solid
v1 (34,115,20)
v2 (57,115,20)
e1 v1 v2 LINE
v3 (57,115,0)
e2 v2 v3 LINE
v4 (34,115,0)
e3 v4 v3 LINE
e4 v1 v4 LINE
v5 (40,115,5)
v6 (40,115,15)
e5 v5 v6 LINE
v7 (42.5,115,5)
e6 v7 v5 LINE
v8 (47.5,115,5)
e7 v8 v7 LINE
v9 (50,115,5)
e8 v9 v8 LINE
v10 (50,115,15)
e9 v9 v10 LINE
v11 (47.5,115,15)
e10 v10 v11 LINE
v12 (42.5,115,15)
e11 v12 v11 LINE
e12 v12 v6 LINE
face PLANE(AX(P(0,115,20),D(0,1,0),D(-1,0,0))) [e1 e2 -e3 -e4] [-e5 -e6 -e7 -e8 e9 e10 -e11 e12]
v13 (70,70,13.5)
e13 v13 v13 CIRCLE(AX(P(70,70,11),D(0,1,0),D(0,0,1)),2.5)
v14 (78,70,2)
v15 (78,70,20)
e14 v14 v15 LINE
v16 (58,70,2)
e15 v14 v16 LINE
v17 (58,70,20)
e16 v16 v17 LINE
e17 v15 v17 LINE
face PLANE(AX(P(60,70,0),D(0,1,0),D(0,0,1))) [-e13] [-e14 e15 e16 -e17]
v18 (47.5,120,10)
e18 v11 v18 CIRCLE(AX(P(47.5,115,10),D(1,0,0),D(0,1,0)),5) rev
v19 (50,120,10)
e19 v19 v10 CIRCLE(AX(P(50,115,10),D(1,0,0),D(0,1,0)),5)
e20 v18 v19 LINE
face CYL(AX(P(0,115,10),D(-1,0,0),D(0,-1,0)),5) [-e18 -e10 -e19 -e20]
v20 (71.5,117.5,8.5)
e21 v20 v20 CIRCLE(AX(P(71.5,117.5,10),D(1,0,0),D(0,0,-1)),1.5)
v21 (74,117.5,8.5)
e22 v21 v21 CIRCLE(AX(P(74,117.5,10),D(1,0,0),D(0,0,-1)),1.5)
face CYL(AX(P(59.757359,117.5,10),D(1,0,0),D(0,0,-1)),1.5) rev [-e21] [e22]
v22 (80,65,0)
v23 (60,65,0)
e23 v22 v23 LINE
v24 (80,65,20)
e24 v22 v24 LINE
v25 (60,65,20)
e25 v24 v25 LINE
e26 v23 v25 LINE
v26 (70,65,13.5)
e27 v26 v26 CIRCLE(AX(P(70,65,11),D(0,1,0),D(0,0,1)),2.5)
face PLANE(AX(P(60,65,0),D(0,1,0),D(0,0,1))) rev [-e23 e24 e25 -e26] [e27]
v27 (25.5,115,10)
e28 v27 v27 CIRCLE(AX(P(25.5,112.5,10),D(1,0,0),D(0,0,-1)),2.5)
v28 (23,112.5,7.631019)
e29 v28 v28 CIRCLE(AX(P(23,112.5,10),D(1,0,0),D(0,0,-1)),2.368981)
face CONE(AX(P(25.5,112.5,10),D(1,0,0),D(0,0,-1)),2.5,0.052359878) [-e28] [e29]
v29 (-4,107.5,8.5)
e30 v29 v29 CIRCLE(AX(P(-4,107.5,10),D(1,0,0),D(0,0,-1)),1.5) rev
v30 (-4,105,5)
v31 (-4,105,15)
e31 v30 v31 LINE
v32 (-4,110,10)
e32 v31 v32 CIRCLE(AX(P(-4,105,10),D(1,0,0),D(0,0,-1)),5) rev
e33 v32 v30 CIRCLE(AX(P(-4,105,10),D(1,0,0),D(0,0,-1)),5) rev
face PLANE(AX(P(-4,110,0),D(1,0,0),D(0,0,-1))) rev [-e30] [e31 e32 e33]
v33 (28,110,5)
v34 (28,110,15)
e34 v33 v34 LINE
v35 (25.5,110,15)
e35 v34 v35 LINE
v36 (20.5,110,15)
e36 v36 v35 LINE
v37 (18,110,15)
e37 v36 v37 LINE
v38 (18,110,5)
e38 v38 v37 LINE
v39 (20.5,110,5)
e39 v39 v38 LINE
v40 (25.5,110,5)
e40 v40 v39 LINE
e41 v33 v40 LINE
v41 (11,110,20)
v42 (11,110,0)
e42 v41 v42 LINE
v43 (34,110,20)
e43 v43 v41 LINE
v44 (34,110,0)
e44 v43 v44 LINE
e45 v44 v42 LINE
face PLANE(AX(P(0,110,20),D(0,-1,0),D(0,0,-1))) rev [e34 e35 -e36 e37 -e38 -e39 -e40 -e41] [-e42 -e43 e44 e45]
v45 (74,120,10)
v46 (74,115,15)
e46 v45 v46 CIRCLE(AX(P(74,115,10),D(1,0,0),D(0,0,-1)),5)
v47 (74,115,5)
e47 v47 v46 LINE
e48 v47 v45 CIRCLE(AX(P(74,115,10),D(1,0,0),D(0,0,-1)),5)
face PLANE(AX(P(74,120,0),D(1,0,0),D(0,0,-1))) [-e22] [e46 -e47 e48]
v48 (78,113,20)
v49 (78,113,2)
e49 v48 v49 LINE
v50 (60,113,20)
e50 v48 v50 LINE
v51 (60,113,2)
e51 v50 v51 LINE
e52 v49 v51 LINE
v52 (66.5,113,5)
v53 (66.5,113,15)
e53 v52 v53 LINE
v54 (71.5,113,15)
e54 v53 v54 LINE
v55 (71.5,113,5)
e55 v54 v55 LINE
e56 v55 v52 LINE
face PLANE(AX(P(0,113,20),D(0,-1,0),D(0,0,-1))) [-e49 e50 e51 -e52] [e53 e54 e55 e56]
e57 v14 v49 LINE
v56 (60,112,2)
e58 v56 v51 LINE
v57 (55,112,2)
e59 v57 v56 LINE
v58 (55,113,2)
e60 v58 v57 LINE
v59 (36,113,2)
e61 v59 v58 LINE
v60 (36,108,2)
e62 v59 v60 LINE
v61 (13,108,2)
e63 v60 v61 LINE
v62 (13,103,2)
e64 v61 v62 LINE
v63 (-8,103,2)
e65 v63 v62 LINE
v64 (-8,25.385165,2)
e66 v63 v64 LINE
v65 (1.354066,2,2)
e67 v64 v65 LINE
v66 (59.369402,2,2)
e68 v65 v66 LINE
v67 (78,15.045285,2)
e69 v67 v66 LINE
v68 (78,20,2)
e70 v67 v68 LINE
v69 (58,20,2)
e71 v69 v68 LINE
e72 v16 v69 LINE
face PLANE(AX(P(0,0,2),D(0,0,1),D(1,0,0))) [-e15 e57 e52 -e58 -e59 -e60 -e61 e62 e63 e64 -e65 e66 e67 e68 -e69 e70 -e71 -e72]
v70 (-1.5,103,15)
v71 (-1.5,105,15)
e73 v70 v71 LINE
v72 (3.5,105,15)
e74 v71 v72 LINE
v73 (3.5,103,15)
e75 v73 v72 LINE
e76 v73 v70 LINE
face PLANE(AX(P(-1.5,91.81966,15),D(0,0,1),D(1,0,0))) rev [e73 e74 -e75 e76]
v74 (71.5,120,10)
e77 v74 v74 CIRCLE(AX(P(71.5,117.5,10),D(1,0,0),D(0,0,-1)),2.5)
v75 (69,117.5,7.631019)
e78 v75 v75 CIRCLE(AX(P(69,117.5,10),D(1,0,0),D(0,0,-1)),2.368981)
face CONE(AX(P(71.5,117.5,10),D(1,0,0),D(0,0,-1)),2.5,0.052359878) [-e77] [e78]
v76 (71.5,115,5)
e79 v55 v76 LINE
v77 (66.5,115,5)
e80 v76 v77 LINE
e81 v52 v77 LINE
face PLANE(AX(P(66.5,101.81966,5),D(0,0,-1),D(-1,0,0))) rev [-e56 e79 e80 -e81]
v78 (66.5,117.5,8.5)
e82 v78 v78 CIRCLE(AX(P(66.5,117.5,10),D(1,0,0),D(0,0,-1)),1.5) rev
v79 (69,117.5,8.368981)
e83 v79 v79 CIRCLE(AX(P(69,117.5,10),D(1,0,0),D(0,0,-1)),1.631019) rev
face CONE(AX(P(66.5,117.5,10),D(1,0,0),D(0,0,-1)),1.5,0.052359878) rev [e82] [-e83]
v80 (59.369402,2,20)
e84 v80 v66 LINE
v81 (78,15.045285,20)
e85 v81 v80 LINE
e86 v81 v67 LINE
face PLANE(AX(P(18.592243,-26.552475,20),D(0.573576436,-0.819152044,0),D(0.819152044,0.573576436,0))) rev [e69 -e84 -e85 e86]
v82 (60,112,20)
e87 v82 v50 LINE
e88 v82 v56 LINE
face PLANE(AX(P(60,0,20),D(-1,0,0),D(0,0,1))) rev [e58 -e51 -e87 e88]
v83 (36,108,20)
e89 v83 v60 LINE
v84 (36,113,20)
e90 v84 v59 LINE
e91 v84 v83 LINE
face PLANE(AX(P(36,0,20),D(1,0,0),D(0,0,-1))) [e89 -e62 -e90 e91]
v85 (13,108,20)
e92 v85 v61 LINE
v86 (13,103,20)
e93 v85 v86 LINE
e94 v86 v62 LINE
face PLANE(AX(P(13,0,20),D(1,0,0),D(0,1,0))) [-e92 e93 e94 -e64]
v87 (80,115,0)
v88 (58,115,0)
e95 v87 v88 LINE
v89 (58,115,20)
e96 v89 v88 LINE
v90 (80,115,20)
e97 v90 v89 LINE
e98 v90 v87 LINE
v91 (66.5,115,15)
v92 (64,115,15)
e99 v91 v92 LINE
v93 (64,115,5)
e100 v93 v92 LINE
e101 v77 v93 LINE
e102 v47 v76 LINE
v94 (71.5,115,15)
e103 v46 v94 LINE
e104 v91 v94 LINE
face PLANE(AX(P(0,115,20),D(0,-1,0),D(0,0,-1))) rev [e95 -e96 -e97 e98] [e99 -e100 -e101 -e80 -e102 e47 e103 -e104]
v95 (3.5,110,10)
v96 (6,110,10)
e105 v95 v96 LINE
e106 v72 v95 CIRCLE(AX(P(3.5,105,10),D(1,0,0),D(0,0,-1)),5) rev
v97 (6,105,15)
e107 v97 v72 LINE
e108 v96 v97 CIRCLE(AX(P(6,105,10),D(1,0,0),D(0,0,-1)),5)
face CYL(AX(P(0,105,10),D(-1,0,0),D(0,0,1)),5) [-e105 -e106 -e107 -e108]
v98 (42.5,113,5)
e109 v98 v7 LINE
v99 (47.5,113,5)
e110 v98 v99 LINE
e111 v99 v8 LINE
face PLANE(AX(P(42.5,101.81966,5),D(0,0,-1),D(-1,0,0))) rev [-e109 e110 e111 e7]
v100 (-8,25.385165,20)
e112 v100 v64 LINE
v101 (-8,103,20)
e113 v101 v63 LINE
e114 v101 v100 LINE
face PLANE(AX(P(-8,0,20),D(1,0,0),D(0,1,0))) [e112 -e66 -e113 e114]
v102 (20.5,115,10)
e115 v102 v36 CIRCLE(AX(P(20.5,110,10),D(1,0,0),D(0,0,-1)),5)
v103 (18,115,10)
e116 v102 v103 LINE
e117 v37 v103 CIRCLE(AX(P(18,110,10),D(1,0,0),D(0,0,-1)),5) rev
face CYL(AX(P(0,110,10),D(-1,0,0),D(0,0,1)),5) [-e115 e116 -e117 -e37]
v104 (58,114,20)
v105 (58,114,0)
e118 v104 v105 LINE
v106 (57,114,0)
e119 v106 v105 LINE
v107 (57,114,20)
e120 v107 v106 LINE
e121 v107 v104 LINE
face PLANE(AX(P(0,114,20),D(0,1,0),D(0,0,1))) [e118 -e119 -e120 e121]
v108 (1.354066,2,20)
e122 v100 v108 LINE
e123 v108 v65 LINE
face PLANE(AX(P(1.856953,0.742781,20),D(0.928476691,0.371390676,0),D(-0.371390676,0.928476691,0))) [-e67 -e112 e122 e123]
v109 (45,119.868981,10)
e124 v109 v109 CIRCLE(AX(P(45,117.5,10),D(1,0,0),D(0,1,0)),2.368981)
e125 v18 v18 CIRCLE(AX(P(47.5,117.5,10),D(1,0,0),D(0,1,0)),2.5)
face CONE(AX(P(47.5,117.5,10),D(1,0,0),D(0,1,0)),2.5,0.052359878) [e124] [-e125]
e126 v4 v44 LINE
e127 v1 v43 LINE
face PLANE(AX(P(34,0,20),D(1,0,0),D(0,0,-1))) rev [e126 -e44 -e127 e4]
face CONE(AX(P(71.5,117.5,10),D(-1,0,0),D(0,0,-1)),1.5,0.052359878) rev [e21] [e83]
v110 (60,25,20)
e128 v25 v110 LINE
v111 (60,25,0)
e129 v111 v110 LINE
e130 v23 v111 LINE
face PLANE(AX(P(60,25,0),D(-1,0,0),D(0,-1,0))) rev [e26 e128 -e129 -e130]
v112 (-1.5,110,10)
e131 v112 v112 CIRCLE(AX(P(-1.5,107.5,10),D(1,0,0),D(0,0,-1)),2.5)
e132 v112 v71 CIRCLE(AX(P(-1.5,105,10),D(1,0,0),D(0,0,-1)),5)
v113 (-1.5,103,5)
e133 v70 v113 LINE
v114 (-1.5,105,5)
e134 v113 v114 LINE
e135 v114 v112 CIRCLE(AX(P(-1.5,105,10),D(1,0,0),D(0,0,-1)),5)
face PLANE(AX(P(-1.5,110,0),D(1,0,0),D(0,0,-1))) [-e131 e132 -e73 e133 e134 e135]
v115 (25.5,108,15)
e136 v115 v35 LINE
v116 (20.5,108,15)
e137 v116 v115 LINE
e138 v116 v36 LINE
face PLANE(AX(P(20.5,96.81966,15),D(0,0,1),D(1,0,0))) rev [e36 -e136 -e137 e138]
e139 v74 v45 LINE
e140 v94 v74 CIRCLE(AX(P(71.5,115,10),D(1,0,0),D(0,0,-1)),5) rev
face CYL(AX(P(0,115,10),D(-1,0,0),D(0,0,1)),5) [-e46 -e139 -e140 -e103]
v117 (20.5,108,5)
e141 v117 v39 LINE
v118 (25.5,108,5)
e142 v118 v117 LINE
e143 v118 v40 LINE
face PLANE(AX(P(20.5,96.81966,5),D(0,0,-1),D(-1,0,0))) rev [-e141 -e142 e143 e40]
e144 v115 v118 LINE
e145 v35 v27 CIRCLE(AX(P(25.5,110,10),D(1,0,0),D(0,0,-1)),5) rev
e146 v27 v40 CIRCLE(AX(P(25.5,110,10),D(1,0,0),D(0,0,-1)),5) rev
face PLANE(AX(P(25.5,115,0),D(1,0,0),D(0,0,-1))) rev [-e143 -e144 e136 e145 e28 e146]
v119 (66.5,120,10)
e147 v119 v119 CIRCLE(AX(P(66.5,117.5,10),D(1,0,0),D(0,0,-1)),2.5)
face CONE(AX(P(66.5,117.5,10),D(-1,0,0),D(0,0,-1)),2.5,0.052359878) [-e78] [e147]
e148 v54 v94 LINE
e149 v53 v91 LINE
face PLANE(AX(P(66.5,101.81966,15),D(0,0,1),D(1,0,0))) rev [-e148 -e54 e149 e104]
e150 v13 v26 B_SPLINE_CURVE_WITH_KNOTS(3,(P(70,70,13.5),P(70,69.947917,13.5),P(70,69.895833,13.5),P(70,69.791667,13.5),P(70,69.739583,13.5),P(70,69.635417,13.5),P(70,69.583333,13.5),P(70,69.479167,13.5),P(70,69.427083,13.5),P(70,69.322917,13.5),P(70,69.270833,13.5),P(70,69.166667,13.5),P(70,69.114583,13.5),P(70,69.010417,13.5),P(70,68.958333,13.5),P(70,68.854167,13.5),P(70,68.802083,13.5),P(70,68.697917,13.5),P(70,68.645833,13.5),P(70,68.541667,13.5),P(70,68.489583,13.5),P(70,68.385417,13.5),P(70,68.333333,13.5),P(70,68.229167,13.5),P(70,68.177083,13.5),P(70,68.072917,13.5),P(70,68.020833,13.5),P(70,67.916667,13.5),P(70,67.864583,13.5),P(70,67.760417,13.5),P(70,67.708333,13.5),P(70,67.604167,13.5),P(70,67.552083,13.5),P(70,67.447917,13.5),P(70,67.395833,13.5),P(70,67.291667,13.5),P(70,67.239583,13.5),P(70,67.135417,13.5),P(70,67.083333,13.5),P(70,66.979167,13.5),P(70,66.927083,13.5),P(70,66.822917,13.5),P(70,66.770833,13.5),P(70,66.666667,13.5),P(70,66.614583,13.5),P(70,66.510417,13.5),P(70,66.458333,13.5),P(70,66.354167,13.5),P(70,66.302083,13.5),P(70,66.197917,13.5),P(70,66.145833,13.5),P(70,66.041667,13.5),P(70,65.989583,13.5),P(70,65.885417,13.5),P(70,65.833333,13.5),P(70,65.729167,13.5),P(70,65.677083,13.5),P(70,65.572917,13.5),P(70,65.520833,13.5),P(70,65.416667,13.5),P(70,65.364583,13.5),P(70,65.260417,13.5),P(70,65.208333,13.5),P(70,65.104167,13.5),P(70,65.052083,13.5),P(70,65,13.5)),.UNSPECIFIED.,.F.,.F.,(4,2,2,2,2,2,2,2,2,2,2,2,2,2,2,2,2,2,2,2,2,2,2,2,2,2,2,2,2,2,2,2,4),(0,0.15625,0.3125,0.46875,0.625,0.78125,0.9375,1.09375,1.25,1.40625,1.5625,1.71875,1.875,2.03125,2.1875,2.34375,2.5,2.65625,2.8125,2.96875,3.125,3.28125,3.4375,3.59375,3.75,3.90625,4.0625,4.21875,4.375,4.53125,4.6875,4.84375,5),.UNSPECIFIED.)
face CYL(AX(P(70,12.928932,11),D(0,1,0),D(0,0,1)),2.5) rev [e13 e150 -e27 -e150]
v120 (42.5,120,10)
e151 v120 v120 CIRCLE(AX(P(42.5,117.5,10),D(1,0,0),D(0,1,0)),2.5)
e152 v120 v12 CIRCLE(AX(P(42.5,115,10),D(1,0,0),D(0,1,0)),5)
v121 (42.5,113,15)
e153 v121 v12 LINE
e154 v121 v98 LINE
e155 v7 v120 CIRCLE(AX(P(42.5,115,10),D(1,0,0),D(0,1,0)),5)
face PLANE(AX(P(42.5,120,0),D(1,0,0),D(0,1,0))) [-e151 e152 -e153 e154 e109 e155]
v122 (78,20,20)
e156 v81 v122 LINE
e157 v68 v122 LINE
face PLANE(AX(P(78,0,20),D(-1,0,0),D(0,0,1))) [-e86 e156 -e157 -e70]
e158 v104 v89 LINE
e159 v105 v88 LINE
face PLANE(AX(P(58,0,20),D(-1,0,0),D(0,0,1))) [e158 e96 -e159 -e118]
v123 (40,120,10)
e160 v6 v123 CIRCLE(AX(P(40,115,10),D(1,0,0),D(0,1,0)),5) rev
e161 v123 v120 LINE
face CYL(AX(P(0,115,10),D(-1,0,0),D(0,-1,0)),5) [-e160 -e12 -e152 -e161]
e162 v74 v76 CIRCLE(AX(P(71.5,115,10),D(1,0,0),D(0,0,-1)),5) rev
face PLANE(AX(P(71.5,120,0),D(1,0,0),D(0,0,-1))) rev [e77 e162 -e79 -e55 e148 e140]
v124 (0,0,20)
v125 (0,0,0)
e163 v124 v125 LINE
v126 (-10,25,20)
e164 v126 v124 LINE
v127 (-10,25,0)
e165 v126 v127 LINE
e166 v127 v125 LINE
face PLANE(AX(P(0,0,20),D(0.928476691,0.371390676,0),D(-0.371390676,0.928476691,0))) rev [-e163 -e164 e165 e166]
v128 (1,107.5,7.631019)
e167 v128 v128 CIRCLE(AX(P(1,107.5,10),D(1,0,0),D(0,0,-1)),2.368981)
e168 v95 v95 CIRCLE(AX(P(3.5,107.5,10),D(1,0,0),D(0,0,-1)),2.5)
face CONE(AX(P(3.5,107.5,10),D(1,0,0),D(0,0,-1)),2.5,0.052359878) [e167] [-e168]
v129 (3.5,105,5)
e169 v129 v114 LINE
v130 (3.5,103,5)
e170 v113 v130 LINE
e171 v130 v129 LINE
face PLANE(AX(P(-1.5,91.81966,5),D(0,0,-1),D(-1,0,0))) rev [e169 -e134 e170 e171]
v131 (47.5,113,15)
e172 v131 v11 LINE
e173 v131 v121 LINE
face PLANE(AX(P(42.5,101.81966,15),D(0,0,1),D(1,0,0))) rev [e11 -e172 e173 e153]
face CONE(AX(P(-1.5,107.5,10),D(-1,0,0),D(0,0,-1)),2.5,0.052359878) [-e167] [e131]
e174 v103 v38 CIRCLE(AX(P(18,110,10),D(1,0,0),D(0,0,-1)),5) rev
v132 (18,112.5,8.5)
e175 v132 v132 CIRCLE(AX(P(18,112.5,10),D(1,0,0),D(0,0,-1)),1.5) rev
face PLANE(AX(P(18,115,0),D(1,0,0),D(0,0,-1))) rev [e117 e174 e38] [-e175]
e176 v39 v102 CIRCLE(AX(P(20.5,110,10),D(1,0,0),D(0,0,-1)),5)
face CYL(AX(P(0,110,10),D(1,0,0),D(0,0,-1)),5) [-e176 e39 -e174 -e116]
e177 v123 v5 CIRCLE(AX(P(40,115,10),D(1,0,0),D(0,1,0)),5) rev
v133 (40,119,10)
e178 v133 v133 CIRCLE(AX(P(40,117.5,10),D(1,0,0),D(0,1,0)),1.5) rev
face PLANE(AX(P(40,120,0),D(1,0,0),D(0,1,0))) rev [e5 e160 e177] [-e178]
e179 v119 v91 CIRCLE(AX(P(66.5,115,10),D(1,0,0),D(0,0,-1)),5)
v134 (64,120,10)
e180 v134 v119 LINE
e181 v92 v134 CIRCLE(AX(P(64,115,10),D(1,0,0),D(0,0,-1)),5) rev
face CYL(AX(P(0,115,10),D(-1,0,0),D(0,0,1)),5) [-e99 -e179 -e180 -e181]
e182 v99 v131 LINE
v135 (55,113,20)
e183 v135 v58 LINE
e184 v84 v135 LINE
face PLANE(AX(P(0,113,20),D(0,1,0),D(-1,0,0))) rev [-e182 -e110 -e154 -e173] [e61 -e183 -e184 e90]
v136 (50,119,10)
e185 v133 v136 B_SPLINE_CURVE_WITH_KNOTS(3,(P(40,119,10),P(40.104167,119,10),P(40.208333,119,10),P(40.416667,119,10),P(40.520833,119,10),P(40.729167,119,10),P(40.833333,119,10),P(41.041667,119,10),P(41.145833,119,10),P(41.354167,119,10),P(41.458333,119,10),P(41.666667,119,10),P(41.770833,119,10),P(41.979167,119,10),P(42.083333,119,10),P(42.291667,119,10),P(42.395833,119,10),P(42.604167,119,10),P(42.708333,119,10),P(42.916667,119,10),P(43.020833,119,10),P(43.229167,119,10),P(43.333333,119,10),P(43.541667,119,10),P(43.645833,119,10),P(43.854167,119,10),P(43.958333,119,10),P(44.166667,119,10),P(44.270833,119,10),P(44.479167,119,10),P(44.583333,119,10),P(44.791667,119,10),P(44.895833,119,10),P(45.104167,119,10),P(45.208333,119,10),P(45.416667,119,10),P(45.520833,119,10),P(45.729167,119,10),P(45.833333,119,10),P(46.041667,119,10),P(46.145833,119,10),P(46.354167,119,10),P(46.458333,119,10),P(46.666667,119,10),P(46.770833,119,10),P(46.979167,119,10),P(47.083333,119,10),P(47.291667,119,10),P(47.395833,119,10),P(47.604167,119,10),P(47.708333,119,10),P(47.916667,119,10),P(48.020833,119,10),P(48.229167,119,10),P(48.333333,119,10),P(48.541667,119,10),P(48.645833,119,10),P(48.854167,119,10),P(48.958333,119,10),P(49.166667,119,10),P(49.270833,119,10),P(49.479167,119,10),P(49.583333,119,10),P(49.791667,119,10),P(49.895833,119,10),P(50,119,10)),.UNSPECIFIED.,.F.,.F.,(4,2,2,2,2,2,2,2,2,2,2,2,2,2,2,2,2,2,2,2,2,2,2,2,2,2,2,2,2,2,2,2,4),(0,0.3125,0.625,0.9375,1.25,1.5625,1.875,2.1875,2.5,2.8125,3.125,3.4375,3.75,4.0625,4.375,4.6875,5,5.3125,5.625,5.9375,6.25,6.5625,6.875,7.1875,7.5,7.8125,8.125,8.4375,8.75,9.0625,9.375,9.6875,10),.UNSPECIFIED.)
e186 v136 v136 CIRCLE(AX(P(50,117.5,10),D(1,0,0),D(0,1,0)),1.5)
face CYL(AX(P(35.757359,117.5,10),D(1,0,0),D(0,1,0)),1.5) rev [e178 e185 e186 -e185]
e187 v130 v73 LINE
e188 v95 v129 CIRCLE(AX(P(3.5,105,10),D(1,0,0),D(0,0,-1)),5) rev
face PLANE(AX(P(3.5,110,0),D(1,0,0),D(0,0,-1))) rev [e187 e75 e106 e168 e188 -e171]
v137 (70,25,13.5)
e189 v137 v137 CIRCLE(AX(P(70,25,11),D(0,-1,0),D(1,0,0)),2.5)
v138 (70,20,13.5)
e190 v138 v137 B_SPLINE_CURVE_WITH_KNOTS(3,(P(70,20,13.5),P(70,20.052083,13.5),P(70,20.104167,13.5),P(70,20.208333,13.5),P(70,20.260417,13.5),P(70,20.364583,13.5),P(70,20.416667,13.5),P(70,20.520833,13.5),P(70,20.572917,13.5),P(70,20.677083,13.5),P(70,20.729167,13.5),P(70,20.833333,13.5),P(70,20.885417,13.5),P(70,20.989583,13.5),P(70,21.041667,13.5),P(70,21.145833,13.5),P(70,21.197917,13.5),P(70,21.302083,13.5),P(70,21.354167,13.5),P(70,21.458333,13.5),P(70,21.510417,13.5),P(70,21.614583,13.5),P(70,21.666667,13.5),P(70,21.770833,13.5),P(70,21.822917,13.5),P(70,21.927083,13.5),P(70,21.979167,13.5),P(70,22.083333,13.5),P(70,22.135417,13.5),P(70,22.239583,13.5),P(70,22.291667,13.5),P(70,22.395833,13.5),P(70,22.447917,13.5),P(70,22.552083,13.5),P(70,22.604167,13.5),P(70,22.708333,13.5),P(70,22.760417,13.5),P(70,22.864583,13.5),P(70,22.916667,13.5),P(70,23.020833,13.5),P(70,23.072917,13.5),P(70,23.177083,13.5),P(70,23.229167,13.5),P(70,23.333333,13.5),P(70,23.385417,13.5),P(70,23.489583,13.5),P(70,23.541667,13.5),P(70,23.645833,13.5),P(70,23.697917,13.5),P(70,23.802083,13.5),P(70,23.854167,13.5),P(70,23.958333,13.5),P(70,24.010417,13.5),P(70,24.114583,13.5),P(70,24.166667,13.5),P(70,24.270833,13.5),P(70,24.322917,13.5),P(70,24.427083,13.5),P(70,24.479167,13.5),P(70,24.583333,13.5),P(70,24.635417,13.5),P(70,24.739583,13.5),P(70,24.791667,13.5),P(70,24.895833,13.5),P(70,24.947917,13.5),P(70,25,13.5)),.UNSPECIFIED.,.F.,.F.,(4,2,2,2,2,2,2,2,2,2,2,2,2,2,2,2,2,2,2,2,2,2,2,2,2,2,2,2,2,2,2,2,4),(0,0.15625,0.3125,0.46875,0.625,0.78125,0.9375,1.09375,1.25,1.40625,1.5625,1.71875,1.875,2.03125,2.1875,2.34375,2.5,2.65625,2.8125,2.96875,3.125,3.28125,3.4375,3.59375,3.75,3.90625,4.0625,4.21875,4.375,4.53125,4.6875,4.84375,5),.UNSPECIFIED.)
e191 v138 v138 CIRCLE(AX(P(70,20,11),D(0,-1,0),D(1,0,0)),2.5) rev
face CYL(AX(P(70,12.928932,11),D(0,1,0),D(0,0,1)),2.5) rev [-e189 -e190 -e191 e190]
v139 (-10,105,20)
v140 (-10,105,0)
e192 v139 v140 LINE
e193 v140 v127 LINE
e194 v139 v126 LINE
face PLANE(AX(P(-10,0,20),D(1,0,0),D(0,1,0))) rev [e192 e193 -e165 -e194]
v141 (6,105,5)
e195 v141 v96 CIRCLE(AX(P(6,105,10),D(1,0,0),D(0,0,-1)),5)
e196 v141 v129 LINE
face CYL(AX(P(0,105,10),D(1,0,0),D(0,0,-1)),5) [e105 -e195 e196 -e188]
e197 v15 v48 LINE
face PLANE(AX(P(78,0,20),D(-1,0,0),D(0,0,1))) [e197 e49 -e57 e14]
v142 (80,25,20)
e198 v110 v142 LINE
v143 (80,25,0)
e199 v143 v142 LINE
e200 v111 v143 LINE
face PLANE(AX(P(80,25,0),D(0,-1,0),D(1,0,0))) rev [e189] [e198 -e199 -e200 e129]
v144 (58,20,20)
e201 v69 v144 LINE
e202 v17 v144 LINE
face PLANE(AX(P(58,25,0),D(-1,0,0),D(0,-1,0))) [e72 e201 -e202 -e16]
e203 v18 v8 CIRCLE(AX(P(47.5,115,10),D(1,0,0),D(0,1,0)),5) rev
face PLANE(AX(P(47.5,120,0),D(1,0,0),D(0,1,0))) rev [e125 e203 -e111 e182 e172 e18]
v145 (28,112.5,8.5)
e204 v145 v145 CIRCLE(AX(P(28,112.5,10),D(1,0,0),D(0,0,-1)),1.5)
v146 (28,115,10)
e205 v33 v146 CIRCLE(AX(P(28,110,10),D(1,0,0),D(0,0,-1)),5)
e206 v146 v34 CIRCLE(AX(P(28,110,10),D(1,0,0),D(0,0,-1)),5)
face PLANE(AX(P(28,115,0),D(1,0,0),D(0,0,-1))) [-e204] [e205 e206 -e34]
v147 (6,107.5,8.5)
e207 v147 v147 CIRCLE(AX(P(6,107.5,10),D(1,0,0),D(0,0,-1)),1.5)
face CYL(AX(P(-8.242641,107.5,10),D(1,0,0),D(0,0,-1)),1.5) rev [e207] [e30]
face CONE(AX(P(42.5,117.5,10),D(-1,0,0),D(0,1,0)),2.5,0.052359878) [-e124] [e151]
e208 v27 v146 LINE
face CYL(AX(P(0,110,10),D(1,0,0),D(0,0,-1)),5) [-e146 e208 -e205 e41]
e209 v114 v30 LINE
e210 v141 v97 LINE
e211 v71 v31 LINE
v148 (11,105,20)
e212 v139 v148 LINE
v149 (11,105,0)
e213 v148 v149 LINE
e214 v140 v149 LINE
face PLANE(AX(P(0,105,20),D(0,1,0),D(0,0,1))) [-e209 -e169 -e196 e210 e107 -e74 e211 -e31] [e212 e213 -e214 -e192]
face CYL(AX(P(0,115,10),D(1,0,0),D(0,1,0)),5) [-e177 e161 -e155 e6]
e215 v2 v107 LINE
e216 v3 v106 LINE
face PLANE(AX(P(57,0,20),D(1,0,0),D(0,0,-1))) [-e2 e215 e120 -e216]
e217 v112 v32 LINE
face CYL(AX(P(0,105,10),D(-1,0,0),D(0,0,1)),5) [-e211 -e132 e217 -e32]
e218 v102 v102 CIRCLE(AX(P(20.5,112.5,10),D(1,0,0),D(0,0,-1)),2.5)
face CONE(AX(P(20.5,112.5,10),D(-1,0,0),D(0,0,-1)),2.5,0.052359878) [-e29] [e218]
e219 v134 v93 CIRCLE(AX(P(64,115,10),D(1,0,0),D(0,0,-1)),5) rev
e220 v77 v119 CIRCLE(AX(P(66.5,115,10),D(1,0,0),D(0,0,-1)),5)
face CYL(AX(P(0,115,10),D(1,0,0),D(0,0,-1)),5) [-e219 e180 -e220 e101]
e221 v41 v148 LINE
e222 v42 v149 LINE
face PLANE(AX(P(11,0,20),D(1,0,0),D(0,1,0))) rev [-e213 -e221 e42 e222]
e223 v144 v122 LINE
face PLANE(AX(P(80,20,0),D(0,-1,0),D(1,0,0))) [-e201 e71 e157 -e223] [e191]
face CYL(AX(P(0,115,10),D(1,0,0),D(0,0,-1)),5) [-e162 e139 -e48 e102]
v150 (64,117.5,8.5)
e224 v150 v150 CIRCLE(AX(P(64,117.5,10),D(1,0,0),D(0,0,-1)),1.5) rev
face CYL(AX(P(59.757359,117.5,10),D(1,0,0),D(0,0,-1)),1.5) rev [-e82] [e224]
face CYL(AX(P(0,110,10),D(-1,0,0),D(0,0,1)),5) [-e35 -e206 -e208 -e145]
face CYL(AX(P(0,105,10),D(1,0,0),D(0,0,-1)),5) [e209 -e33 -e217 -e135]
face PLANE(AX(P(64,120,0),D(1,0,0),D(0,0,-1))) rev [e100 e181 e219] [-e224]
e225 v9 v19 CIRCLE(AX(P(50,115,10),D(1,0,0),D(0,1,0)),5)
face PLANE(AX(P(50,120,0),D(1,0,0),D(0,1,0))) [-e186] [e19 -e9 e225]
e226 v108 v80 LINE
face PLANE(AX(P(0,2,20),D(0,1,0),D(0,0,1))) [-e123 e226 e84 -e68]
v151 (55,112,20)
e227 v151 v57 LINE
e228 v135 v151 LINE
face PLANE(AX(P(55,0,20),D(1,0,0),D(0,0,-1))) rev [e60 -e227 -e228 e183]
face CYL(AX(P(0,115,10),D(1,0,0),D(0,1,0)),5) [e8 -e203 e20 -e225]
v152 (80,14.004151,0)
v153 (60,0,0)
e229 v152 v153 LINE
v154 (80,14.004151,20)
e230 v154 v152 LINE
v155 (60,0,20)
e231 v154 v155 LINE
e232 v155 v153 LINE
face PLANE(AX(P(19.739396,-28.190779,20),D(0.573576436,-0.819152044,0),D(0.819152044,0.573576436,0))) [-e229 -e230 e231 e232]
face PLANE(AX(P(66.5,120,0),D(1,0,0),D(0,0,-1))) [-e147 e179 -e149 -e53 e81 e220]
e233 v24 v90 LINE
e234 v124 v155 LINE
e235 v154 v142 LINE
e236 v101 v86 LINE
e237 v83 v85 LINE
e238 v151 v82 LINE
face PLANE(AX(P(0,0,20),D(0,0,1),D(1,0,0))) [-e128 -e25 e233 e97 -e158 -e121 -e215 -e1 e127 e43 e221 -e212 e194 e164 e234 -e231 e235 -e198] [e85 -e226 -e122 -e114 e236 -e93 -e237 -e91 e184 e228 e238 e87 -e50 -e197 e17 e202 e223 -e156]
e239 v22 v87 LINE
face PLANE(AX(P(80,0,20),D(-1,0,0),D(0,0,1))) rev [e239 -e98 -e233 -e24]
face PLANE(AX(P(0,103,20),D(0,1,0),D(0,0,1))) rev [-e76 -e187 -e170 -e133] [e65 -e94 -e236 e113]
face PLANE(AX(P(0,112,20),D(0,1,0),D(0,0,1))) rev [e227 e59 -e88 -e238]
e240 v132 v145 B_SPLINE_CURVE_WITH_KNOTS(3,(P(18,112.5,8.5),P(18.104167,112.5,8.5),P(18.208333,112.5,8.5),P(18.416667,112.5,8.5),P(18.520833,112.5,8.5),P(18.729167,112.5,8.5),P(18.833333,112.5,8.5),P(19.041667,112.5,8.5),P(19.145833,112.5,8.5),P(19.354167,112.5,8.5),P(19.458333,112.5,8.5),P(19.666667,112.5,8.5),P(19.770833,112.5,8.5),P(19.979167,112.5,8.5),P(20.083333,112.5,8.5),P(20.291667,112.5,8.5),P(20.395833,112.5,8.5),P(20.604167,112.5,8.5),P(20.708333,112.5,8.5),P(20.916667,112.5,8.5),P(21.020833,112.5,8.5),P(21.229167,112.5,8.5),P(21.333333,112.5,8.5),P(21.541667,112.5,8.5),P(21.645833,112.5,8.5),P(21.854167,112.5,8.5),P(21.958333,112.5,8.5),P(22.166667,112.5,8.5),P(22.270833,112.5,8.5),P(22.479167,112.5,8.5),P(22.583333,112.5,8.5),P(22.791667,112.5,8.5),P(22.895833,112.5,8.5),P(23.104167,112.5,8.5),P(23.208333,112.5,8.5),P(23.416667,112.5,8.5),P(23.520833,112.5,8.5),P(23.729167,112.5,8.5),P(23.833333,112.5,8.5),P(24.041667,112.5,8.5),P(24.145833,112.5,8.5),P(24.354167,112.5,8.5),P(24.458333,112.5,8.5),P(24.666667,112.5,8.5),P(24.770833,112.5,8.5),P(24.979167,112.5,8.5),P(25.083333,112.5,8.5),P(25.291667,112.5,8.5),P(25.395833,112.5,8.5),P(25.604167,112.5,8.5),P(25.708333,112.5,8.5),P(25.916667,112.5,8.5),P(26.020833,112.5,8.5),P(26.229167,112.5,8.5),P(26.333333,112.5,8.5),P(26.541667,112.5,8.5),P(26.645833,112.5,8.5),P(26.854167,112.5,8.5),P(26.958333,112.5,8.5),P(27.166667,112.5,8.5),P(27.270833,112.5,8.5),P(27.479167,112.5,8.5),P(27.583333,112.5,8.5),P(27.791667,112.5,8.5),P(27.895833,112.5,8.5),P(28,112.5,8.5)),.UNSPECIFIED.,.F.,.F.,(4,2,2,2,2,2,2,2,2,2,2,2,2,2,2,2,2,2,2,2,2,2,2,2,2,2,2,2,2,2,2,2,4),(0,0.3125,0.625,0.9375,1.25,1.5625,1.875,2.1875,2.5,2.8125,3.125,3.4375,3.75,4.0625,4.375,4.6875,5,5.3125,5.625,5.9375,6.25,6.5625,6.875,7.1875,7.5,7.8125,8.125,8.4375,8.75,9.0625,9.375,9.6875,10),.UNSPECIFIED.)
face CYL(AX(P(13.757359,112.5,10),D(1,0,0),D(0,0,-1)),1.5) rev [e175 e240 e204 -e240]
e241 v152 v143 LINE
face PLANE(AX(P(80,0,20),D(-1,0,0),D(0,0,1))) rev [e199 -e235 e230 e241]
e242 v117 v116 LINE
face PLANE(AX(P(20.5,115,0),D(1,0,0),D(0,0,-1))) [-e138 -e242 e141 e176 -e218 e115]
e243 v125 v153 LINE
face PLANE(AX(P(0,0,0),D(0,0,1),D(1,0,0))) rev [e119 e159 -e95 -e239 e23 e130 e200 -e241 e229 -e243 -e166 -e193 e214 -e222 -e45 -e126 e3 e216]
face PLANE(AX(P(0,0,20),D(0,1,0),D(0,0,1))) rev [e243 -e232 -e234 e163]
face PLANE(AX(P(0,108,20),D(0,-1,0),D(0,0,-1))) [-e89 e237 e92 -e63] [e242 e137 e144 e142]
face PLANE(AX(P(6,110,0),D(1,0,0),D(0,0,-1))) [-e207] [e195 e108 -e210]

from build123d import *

# Parameters (mm, degrees)
BOSS_EXTRUDE1_DEPTH       = 20
SKETCH2_W                 = 20
SKETCH2_H                 = 40
CUT_EXTRUDE1_DEPTH        = 142.509716981
SHELL1_T                  = -2
SHELL1_THICKNESS_2_FACE_W = 20
SHELL1_THICKNESS_2_FACE_H = 18
SHELL1_THICKNESS_2_DEPTH  = 3
SHELL1_THICKNESS_3_FACE_W = 18
SHELL1_THICKNESS_3_FACE_H = 20
SHELL1_THICKNESS_3_DEPTH  = 3
CUT_EXTRUDE14_REACH       = 110.167
SKETCH34_R                = 2.5
SKETCH3_W                 = 2.5
SKETCH3_H                 = 10
BOSS_EXTRUDE2_DEPTH       = 5
FILLET2_R                 = 5
CUT_EXTRUDE3_REACH        = 149.838
SKETCH6_R                 = 1.5
SKETCH21_R                = 2.5
SKETCH21_R_2              = 1.5
BOSS_EXTRUDE10_DEPTH      = 2.5
BOSS_EXTRUDE10_DRAFT      = 3
MIRROR7_COPY_1_SKETCH_R   = 2.5
MIRROR7_COPY_1_SKETCH_R_2 = 1.5
MIRROR7_COPY_1_DEPTH      = 2.5
MIRROR7_COPY_1_DRAFT      = 3
SKETCH26_W                = 5
SKETCH26_H                = 10
CUT_EXTRUDE8_DEPTH        = 2
SKETCH7_W                 = 2.5
SKETCH7_H                 = 10
BOSS_EXTRUDE4_DEPTH       = 5
FILLET4_R                 = 5
SKETCH22_R                = 2.5
BOSS_EXTRUDE11_DEPTH      = 2.5
BOSS_EXTRUDE11_TAPER      = 3
SKETCH23_R                = 1.5
CUT_EXTRUDE7_DEPTH        = 10
SKETCH27_W                = 5
SKETCH27_H                = 10
CUT_EXTRUDE9_DEPTH        = 2
SKETCH10_W                = 2.5
SKETCH10_H                = 10
BOSS_EXTRUDE6_DEPTH       = 5
FILLET6_R                 = 5
SKETCH28_R                = 2.5
BOSS_EXTRUDE12_DEPTH      = 2.5
BOSS_EXTRUDE12_TAPER      = 3
SKETCH29_R                = 1.5
CUT_EXTRUDE10_DEPTH       = 10
SKETCH30_W                = 5
SKETCH30_H                = 10
CUT_EXTRUDE11_DEPTH       = 2
SKETCH13_W                = 2.5
SKETCH13_H                = 10
BOSS_EXTRUDE8_DEPTH       = 5
FILLET8_R                 = 5
SKETCH31_R                = 2.5
BOSS_EXTRUDE13_DEPTH      = 2.5
BOSS_EXTRUDE13_TAPER      = 3
SKETCH32_R                = 1.5
CUT_EXTRUDE12_DEPTH       = 10
SKETCH33_W                = 5
SKETCH33_H                = 10
CUT_EXTRUDE13_DEPTH       = 2


with BuildPart() as part:
    # Sketch1 → Boss-Extrude1 (new body)
    with BuildSketch(Plane.XY):
        Polygon((58, 114), (58, 115), (80, 115), (80, 20), (60, 0), (0, 0), (-10, 25), (-10, 105), (11, 105), (11, 110), (12, 110), (34, 110), (34, 115), (35, 115), (57, 115), (57, 114), align=None)
        Polygon((80, 14.004150764), (60, 0), (80, 20), align=None)
    extrude(amount=BOSS_EXTRUDE1_DEPTH)

    # Sketch2 → Cut-Extrude1 (cut, through all)
    with BuildSketch(Plane.XY.offset(20)):
        with Locations((70, 45)):
            Rectangle(SKETCH2_W, SKETCH2_H)
    extrude(amount=-CUT_EXTRUDE1_DEPTH, mode=Mode.SUBTRACT)

    # Shell1
    shell1_openings = [part.faces().sort_by_distance(p)[0] for p in [
        (32.82341614, 58.185068385, 20),
    ]]
    offset(amount=SHELL1_T, openings=shell1_openings, kind=Kind.INTERSECTION)

    # Shell1 thickness 2 face (on inner face of the shell) → Shell1 thickness 2 (add)
    with BuildSketch(Plane(origin=(68, 23, 11), x_dir=(1, 0, 0), z_dir=(0, 1, 0))):
        Rectangle(SHELL1_THICKNESS_2_FACE_W, SHELL1_THICKNESS_2_FACE_H)
    extrude(amount=-SHELL1_THICKNESS_2_DEPTH)

    # Shell1 thickness 3 face (on inner face of the shell) → Shell1 thickness 3 (add)
    with BuildSketch(Plane(origin=(68, 67, 11), x_dir=(0, 0, -1), z_dir=(0, -1, 0))):
        Rectangle(SHELL1_THICKNESS_3_FACE_W, SHELL1_THICKNESS_3_FACE_H)
    extrude(amount=-SHELL1_THICKNESS_3_DEPTH)

    # Cut-Extrude14: up to this face of the body (flat: up to its plane)
    cut_extrude14_end = Plane(part.part.faces().sort_by_distance((68, 20, 11))[0])
    # Sketch34 → Cut-Extrude14 (cut, up to the picked face)
    with BuildSketch(Plane(origin=(0, 70, 0), x_dir=(1, 0, 0), z_dir=(0, 1, 0)), mode=Mode.PRIVATE) as cut_extrude14_sk1:
        with Locations(Location((70, -11, 0), (0, 0, 270))):
            Circle(SKETCH34_R)
    cut_extrude14_tool1 = split(extrude(cut_extrude14_sk1.sketch, amount=-CUT_EXTRUDE14_REACH, mode=Mode.PRIVATE), bisect_by=cut_extrude14_end, keep=Keep.BOTH, mode=Mode.PRIVATE)
    add(cut_extrude14_tool1.solids().sort_by(Axis((70, 70, 11), (0, -1, 0)))[0], mode=Mode.SUBTRACT)

    # Sketch3 → Boss-Extrude2 (add)
    with BuildSketch(Plane(origin=(0, 115, 0), x_dir=(1, 0, 0), z_dir=(0, 1, 0))):
        with Locations((65.25, -10)):
            Rectangle(SKETCH3_W, SKETCH3_H)
        with Locations((72.75, -10)):
            Rectangle(SKETCH3_W, SKETCH3_H)
    extrude(amount=BOSS_EXTRUDE2_DEPTH)

    # Fillet2
    fillet2_edges = [part.edges().sort_by_distance(p)[0] for p in [
        (65.25, 120, 5),
        (65.25, 120, 15),
        (72.75, 120, 5),
        (72.75, 120, 15),
    ]]
    fillet(fillet2_edges, radius=FILLET2_R - 0.0001)  # a hair under: the kernel refuses the full size

    # Cut-Extrude3: up to this face of the body (flat: up to its plane)
    cut_extrude3_end = Plane(part.part.faces().sort_by_distance((64, 117.122079053, 10))[0])
    # Sketch6 → Cut-Extrude3 (cut, up to the picked face)
    with BuildSketch(Plane(origin=(74, 0, 0), x_dir=(0, 0, -1), z_dir=(1, 0, 0)), mode=Mode.PRIVATE) as cut_extrude3_sk1:
        with Locations((-10, 117.5)):
            Circle(SKETCH6_R)
    cut_extrude3_tool1 = split(extrude(cut_extrude3_sk1.sketch, amount=-CUT_EXTRUDE3_REACH, mode=Mode.PRIVATE), bisect_by=cut_extrude3_end, keep=Keep.BOTH, mode=Mode.PRIVATE)
    add(cut_extrude3_tool1.solids().sort_by(Axis((74, 117.5, 10), (-1, 0, 0)))[0], mode=Mode.SUBTRACT)


with BuildPart() as boss_extrude10_tool:
    # Sketch21 → Boss-Extrude10 (with draft: the straight prism first)
    with BuildSketch(Plane(origin=(66.5, 0, 0), x_dir=(0, 0, -1), z_dir=(1, 0, 0))):
        with Locations((-10, 117.5)):
            Circle(SKETCH21_R)
        with Locations((-10, 117.5)):
            Circle(SKETCH21_R_2, mode=Mode.SUBTRACT)
    extrude(amount=BOSS_EXTRUDE10_DEPTH)
    # Boss-Extrude10: the draft: its side faces are tilted about the plane it starts from
    boss_extrude10_sides = [boss_extrude10_tool.faces().sort_by_distance(p)[0] for p in [
        (67.75, 117.5, 12.5),
        (67.75, 117.5, 11.5),
    ]]
    draft(boss_extrude10_sides, Plane(origin=(66.5, 0, 0), x_dir=(0, 0, -1), z_dir=(1, 0, 0)), BOSS_EXTRUDE10_DRAFT)


with BuildPart() as part_1:
    add(part.part)

    # Boss-Extrude10: add boss_extrude10_tool
    add(boss_extrude10_tool.part)


with BuildPart() as mirror7_copy_1_tool:
    # Mirror7 copy 1 sketch → Mirror7 copy 1 (with draft: the straight prism first)
    with BuildSketch(Plane(origin=(71.5, 0, 0), x_dir=(0, 0, -1), z_dir=(-1, 0, 0))):
        with Locations((-10, -117.5)):
            Circle(MIRROR7_COPY_1_SKETCH_R)
        with Locations((-10, -117.5)):
            Circle(MIRROR7_COPY_1_SKETCH_R_2, mode=Mode.SUBTRACT)
    extrude(amount=MIRROR7_COPY_1_DEPTH)
    # Mirror7 copy 1: the draft: its side faces are tilted about the plane it starts from
    mirror7_copy_1_sides = [mirror7_copy_1_tool.faces().sort_by_distance(p)[0] for p in [
        (70.25, 117.5, 12.5),
        (70.25, 117.5, 11.5),
    ]]
    draft(mirror7_copy_1_sides, Plane(origin=(71.5, 0, 0), x_dir=(0, 0, -1), z_dir=(-1, 0, 0)), MIRROR7_COPY_1_DRAFT)


with BuildPart() as part_2:
    add(part_1.part)

    # Mirror7 copy 1: add mirror7_copy_1_tool
    add(mirror7_copy_1_tool.part)

    # Sketch26 → Cut-Extrude8 (cut)
    with BuildSketch(Plane(origin=(0, 115, 0), x_dir=(1, 0, 0), z_dir=(0, 1, 0))):
        with Locations((69, -10)):
            Rectangle(SKETCH26_W, SKETCH26_H)
    extrude(amount=-CUT_EXTRUDE8_DEPTH, mode=Mode.SUBTRACT)

    # Sketch7 → Boss-Extrude4 (add)
    with BuildSketch(Plane(origin=(0, 115, 0), x_dir=(1, 0, 0), z_dir=(0, 1, 0))):
        with Locations((41.25, -10)):
            Rectangle(SKETCH7_W, SKETCH7_H)
        with Locations((48.75, -10)):
            Rectangle(SKETCH7_W, SKETCH7_H)
    extrude(amount=BOSS_EXTRUDE4_DEPTH)

    # Fillet4
    fillet4_edges = [part_2.edges().sort_by_distance(p)[0] for p in [
        (41.25, 120, 5),
        (41.25, 120, 15),
        (48.75, 120, 5),
        (48.75, 120, 15),
    ]]
    fillet(fillet4_edges, radius=FILLET4_R - 0.0001)  # a hair under: the kernel refuses the full size

    # Sketch22 → Boss-Extrude11 (add)
    with BuildSketch(Plane(origin=(42.5, 0, 0), x_dir=(0, 0, -1), z_dir=(1, 0, 0))):
        with Locations((-10, 117.5)):
            Circle(SKETCH22_R)
    boss_extrude11 = extrude(amount=BOSS_EXTRUDE11_DEPTH, taper=BOSS_EXTRUDE11_TAPER)

    # Mirror8: Boss-Extrude11 across plane
    add(boss_extrude11.mirror(Plane(origin=(45, 117.5, 10), x_dir=(0, 0, 1), z_dir=(1, 0, 0))))

    # Sketch23 → Cut-Extrude7 (cut)
    with BuildSketch(Plane(origin=(50, 0, 0), x_dir=(0, 0, -1), z_dir=(1, 0, 0))):
        with Locations((-10, 117.5)):
            Circle(SKETCH23_R)
    extrude(amount=-CUT_EXTRUDE7_DEPTH, mode=Mode.SUBTRACT)

    # Sketch27 → Cut-Extrude9 (cut)
    with BuildSketch(Plane(origin=(0, 115, 0), x_dir=(1, 0, 0), z_dir=(0, 1, 0))):
        with Locations((45, -10)):
            Rectangle(SKETCH27_W, SKETCH27_H)
    extrude(amount=-CUT_EXTRUDE9_DEPTH, mode=Mode.SUBTRACT)

    # Sketch10 → Boss-Extrude6 (add)
    with BuildSketch(Plane(origin=(0, 110, 0), x_dir=(1, 0, 0), z_dir=(0, 1, 0))):
        with Locations((19.25, -10)):
            Rectangle(SKETCH10_W, SKETCH10_H)
        with Locations((26.75, -10)):
            Rectangle(SKETCH10_W, SKETCH10_H)
    extrude(amount=BOSS_EXTRUDE6_DEPTH)

    # Fillet6
    fillet6_edges = [part_2.edges().sort_by_distance(p)[0] for p in [
        (19.25, 115, 15),
        (19.25, 115, 5),
        (26.75, 115, 5),
        (26.75, 115, 15),
    ]]
    fillet(fillet6_edges, radius=FILLET6_R - 0.0001)  # a hair under: the kernel refuses the full size

    # Sketch28 → Boss-Extrude12 (add)
    with BuildSketch(Plane(origin=(20.5, 0, 0), x_dir=(0, 0, -1), z_dir=(1, 0, 0))):
        with Locations((-10, 112.5)):
            Circle(SKETCH28_R)
    boss_extrude12 = extrude(amount=BOSS_EXTRUDE12_DEPTH, taper=BOSS_EXTRUDE12_TAPER)

    # Mirror9: Boss-Extrude12 across plane
    add(boss_extrude12.mirror(Plane(origin=(23, 112.5, 10), x_dir=(0, 0, 1), z_dir=(1, 0, 0))))

    # Sketch29 → Cut-Extrude10 (cut)
    with BuildSketch(Plane(origin=(28, 0, 0), x_dir=(0, 0, -1), z_dir=(1, 0, 0))):
        with Locations((-10, 112.5)):
            Circle(SKETCH29_R)
    extrude(amount=-CUT_EXTRUDE10_DEPTH, mode=Mode.SUBTRACT)

    # Sketch30 → Cut-Extrude11 (cut)
    with BuildSketch(Plane(origin=(0, 110, 0), x_dir=(1, 0, 0), z_dir=(0, 1, 0))):
        with Locations((23, -10)):
            Rectangle(SKETCH30_W, SKETCH30_H)
    extrude(amount=-CUT_EXTRUDE11_DEPTH, mode=Mode.SUBTRACT)

    # Sketch13 → Boss-Extrude8 (add)
    with BuildSketch(Plane(origin=(0, 105, 0), x_dir=(1, 0, 0), z_dir=(0, 1, 0))):
        with Locations((-2.75, -10)):
            Rectangle(SKETCH13_W, SKETCH13_H)
        with Locations((4.75, -10)):
            Rectangle(SKETCH13_W, SKETCH13_H)
    extrude(amount=BOSS_EXTRUDE8_DEPTH)

    # Fillet8
    fillet8_edges = [part_2.edges().sort_by_distance(p)[0] for p in [
        (-2.75, 110, 15),
        (-2.75, 110, 5),
        (4.75, 110, 5),
        (4.75, 110, 15),
    ]]
    fillet(fillet8_edges, radius=FILLET8_R - 0.0001)  # a hair under: the kernel refuses the full size

    # Sketch31 → Boss-Extrude13 (add)
    with BuildSketch(Plane(origin=(-1.5, 0, 0), x_dir=(0, 0, -1), z_dir=(1, 0, 0))):
        with Locations((-10, 107.5)):
            Circle(SKETCH31_R)
    boss_extrude13 = extrude(amount=BOSS_EXTRUDE13_DEPTH, taper=BOSS_EXTRUDE13_TAPER)

    # Mirror10: Boss-Extrude13 across plane
    add(boss_extrude13.mirror(Plane(origin=(1, 107.5, 10), x_dir=(0, 0, 1), z_dir=(1, 0, 0))))

    # Sketch32 → Cut-Extrude12 (cut)
    with BuildSketch(Plane(origin=(6, 0, 0), x_dir=(0, 0, -1), z_dir=(1, 0, 0))):
        with Locations((-10, 107.5)):
            Circle(SKETCH32_R)
    extrude(amount=-CUT_EXTRUDE12_DEPTH, mode=Mode.SUBTRACT)

    # Sketch33 → Cut-Extrude13 (cut)
    with BuildSketch(Plane(origin=(0, 105, 0), x_dir=(1, 0, 0), z_dir=(0, 1, 0))):
        with Locations((1, -10)):
            Rectangle(SKETCH33_W, SKETCH33_H)
    extrude(amount=-CUT_EXTRUDE13_DEPTH, mode=Mode.SUBTRACT)


solid = part_2.part
